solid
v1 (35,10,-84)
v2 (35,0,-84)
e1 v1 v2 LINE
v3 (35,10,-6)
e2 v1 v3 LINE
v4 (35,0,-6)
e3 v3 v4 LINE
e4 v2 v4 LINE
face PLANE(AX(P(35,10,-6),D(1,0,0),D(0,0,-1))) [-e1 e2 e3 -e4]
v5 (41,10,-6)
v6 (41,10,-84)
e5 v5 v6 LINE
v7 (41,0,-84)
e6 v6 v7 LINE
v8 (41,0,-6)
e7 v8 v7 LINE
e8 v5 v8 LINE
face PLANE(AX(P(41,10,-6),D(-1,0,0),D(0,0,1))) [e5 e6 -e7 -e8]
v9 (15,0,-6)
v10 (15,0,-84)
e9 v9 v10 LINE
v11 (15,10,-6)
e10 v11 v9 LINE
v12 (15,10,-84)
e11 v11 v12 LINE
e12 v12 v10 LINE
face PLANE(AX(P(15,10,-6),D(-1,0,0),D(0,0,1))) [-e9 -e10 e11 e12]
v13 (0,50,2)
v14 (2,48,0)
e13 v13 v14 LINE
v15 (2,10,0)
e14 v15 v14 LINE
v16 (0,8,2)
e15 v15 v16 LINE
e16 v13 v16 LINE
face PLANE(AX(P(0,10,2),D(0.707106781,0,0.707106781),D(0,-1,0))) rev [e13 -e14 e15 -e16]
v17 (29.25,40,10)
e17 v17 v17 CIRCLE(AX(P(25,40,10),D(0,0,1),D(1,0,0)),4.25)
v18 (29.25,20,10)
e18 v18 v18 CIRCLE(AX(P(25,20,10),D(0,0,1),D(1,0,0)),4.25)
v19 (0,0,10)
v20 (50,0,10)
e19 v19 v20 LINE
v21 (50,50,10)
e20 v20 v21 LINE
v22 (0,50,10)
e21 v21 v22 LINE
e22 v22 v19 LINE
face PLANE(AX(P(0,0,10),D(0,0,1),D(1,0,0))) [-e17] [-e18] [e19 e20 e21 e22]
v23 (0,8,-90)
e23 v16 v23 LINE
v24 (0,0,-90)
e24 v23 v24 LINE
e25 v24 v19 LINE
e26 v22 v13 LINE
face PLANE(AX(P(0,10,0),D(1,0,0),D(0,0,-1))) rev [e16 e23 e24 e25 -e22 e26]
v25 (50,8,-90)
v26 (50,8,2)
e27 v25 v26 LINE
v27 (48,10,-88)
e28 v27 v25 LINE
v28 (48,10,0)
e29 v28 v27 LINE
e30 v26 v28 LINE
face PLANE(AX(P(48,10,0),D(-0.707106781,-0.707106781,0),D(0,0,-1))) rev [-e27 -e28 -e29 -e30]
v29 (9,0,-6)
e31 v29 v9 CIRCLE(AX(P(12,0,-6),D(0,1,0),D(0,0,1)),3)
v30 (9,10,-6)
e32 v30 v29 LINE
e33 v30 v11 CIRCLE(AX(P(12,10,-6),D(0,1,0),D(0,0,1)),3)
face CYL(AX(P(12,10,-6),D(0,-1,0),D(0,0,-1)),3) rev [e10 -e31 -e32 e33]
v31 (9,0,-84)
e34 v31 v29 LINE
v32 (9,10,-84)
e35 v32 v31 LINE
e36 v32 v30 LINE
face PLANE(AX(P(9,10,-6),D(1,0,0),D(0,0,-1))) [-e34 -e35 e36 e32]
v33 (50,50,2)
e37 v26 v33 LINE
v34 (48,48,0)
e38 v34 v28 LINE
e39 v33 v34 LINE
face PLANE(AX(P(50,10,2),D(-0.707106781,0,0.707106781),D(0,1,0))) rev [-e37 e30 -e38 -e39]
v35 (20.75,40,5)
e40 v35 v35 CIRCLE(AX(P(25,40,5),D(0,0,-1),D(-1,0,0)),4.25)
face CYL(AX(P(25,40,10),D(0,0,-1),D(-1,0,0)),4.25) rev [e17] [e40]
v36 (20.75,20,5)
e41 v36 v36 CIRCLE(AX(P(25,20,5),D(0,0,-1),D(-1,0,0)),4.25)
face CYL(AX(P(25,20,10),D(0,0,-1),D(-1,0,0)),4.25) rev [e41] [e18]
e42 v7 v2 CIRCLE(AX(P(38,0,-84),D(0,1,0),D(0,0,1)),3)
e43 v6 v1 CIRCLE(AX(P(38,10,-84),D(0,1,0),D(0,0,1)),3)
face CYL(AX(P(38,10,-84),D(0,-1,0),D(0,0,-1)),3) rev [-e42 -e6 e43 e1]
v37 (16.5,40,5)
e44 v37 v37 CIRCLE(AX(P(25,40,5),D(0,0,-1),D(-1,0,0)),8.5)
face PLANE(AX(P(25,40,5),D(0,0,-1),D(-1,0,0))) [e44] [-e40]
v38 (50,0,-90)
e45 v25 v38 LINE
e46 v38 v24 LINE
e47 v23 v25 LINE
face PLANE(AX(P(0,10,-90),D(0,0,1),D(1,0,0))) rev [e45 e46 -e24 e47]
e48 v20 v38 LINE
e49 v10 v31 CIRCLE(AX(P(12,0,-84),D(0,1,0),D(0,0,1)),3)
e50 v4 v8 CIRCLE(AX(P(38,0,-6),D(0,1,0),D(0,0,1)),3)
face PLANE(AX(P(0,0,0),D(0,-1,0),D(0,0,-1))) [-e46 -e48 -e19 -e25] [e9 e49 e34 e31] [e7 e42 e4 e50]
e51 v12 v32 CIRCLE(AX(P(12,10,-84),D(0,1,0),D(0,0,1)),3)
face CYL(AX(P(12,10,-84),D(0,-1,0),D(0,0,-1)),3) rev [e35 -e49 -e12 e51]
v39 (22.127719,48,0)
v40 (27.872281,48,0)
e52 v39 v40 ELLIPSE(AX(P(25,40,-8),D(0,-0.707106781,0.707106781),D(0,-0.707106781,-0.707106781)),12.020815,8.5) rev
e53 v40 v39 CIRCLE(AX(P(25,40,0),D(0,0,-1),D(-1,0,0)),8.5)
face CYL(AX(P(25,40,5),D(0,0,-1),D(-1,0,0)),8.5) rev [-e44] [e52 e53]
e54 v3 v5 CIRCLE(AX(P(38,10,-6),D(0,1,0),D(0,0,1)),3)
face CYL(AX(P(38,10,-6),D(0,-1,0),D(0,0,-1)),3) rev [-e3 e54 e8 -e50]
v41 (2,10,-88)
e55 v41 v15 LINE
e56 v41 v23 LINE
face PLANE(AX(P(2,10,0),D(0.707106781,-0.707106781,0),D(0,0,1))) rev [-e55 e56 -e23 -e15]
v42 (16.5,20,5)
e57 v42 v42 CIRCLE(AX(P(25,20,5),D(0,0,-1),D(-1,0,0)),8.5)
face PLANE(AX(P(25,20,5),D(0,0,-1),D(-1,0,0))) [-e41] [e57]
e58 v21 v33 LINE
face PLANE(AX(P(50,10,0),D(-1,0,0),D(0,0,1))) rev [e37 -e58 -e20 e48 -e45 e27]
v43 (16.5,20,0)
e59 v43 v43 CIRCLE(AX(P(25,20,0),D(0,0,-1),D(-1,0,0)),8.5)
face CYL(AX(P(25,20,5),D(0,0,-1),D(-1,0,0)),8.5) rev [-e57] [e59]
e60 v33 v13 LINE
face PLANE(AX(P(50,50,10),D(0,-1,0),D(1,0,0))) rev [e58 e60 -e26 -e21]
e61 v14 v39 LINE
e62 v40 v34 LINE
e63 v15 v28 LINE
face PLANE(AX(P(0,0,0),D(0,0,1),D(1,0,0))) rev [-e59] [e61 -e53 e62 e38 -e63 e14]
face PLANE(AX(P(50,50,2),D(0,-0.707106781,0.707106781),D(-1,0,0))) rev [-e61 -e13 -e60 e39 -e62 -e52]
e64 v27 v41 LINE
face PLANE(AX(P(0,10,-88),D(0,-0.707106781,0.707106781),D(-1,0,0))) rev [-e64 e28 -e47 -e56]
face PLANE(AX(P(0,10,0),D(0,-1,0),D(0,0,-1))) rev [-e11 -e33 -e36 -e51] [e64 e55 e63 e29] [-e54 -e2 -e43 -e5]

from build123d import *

# Parameters (mm, degrees)
SKETCH1_W           = 50
SKETCH1_H           = 90
BOSS_EXTRUDE1_DEPTH = 10
SKETCH2_W           = 50
SKETCH2_H           = 50
SKETCH2_R           = 4.25
BOSS_EXTRUDE2_DEPTH = 10
SKETCH3_R           = 8.5
CUT_EXTRUDE1_DEPTH  = 5
CHAMFER1_SIZE       = 2


with BuildPart() as part:
    # Sketch1 → Boss-Extrude1 (new body)
    with BuildSketch(Plane(origin=(0, 0, 0), x_dir=(1, 0, 0), z_dir=(0, 1, 0))):
        with Locations((25, 45)):
            Rectangle(SKETCH1_W, SKETCH1_H)
        with BuildLine():
            Line((9, 6), (9, 84))
            ThreePointArc((9, 84), (12, 87), (15, 84))
            Line((15, 84), (15, 6))
            ThreePointArc((15, 6), (12, 3), (9, 6))
        make_face(mode=Mode.SUBTRACT)
        with BuildLine():
            Line((35, 6), (35, 84))
            ThreePointArc((35, 84), (38, 87), (41, 84))
            Line((41, 84), (41, 6))
            ThreePointArc((41, 6), (38, 3), (35, 6))
        make_face(mode=Mode.SUBTRACT)
    extrude(amount=BOSS_EXTRUDE1_DEPTH)

    # Sketch2 → Boss-Extrude2 (add)
    with BuildSketch(Plane.XY):
        with Locations((25, 25)):
            Rectangle(SKETCH2_W, SKETCH2_H)
        with Locations((25, 40)):
            Circle(SKETCH2_R, mode=Mode.SUBTRACT)
        with Locations((25, 20)):
            Circle(SKETCH2_R, mode=Mode.SUBTRACT)
    extrude(amount=BOSS_EXTRUDE2_DEPTH)

    # Sketch3 → Cut-Extrude1 (cut)
    with BuildSketch(Plane(origin=(0, 0, 0), x_dir=(-1, 0, 0), z_dir=(0, 0, -1))):
        with Locations((-25, 40)):
            Circle(SKETCH3_R)
        with Locations((-25, 20)):
            Circle(SKETCH3_R)
    extrude(amount=-CUT_EXTRUDE1_DEPTH, mode=Mode.SUBTRACT)

    # Chamfer1
    # the kernel refuses this chamfer: 2 mm, written as the material it takes off along each edge
    with BuildSketch(Plane(origin=(50, 10, 0), x_dir=(0.027495876610585623, -0.9996219169112968, 0), z_dir=(0, 0, -1))) as chamfer1_piece_1:
        Polygon((CHAMFER1_SIZE * 0.999621916911, CHAMFER1_SIZE * 0.0274958766106), (-CHAMFER1_SIZE * 0.0274958766106, CHAMFER1_SIZE * 0.999621916911), (0, 0), align=None)
    extrude(amount=95.143365976, mode=Mode.SUBTRACT)
    with BuildSketch(Plane(origin=(55.143365976, 10, -90), x_dir=(0, -0.9996219169112968, -0.027495876610589075), z_dir=(-1, 0, 0)), Plane(origin=(-5.143365976, 50, 0), x_dir=(0, 0.02749587661058563, 0.9996219169112968), z_dir=(1, 0, 0))) as chamfer1_piece_2:
        Polygon((CHAMFER1_SIZE * 0.999621916911, CHAMFER1_SIZE * 0.0274958766106), (-CHAMFER1_SIZE * 0.0274958766106, CHAMFER1_SIZE * 0.999621916911), (0, 0), align=None)
    extrude(amount=60.286731952, mode=Mode.SUBTRACT)
    with BuildSketch(Plane(origin=(50, 55.143365976, 0), x_dir=(0.02749587661058563, 0, 0.9996219169112968), z_dir=(0, -1, 0))) as chamfer1_piece_3:
        Polygon((CHAMFER1_SIZE * 0.999621916911, CHAMFER1_SIZE * 0.0274958766106), (-CHAMFER1_SIZE * 0.0274958766106, CHAMFER1_SIZE * 0.999621916911), (0, 0), align=None)
    extrude(amount=45.143365976, mode=Mode.SUBTRACT)
    with BuildSketch(Plane(origin=(0, 10, 0), x_dir=(0.9996219169112968, 0, -0.027495876610586372), z_dir=(0, 1, 0))) as chamfer1_piece_4:
        Polygon((CHAMFER1_SIZE * 0.999621916911, -CHAMFER1_SIZE * 0.0274958766106), (-CHAMFER1_SIZE * 0.0274958766106, -CHAMFER1_SIZE * 0.999621916911), (0, 0), align=None)
    extrude(amount=45.143365976, mode=Mode.SUBTRACT)
    with BuildSketch(Plane(origin=(0, 10, -95.143365976), x_dir=(0.9996219169112968, 0.027495876610586494, 0), z_dir=(0, 0, 1))) as chamfer1_piece_5:
        Polygon((CHAMFER1_SIZE * 0.999621916911, -CHAMFER1_SIZE * 0.0274958766106), (-CHAMFER1_SIZE * 0.0274958766106, -CHAMFER1_SIZE * 0.999621916911), (0, 0), align=None)
    extrude(amount=95.143365976, mode=Mode.SUBTRACT)
    with BuildSketch(Plane(origin=(50, 55.143365976, 0), x_dir=(0.02749587661058563, 0, 0.9996219169112968), z_dir=(0, -1, 0))) as chamfer1_piece_6a_section:
        Polygon((CHAMFER1_SIZE * 0.999621916911, CHAMFER1_SIZE * 0.0274958766106), (-CHAMFER1_SIZE * 0.0274958766106, CHAMFER1_SIZE * 0.999621916911), (0, 0), align=None)
    chamfer1_piece_6a = extrude(amount=50.286731952, mode=Mode.PRIVATE)
    chamfer1_piece_6a = split(chamfer1_piece_6a, bisect_by=Plane(origin=(49.340412746, 10, 0.659587254), z_dir=(0, -1, 0)), keep=Keep.TOP, mode=Mode.PRIVATE)
    with BuildSketch(Plane(origin=(50, 10, 5.143365976), x_dir=(0.027495876610585623, -0.9996219169112968, 0), z_dir=(0, 0, -1))) as chamfer1_piece_6b_section:
        Polygon((CHAMFER1_SIZE * 0.999621916911, CHAMFER1_SIZE * 0.0274958766106), (-CHAMFER1_SIZE * 0.0274958766106, CHAMFER1_SIZE * 0.999621916911), (0, 0), align=None)
    chamfer1_piece_6b = extrude(amount=100.286731952, mode=Mode.PRIVATE)
    chamfer1_piece_6b = split(chamfer1_piece_6b, bisect_by=Plane(origin=(49.340412746, 9.340412746, 0), z_dir=(0, 0, 1)), keep=Keep.TOP, mode=Mode.PRIVATE)
    chamfer1_piece_6 = chamfer1_piece_6a & chamfer1_piece_6b
    add(chamfer1_piece_6, mode=Mode.SUBTRACT)
    with BuildSketch(Plane(origin=(0, 4.856634024, 0), x_dir=(0.9996219169112968, 0, -0.027495876610586372), z_dir=(0, 1, 0))) as chamfer1_piece_7a_section:
        Polygon((CHAMFER1_SIZE * 0.999621916911, -CHAMFER1_SIZE * 0.0274958766106), (-CHAMFER1_SIZE * 0.0274958766106, -CHAMFER1_SIZE * 0.999621916911), (0, 0), align=None)
    chamfer1_piece_7a = extrude(amount=50.286731952, mode=Mode.PRIVATE)
    chamfer1_piece_7a = split(chamfer1_piece_7a, bisect_by=Plane(origin=(0.659587254, 10, 0.659587254), z_dir=(0, -1, 0)), keep=Keep.TOP, mode=Mode.PRIVATE)
    with BuildSketch(Plane(origin=(0, 10, -95.143365976), x_dir=(0.9996219169112968, 0.027495876610586494, 0), z_dir=(0, 0, 1))) as chamfer1_piece_7b_section:
        Polygon((CHAMFER1_SIZE * 0.999621916911, -CHAMFER1_SIZE * 0.0274958766106), (-CHAMFER1_SIZE * 0.0274958766106, -CHAMFER1_SIZE * 0.999621916911), (0, 0), align=None)
    chamfer1_piece_7b = extrude(amount=100.286731952, mode=Mode.PRIVATE)
    chamfer1_piece_7b = split(chamfer1_piece_7b, bisect_by=Plane(origin=(0.659587254, 9.340412746, 0), z_dir=(0, 0, 1)), keep=Keep.TOP, mode=Mode.PRIVATE)
    chamfer1_piece_7 = chamfer1_piece_7a & chamfer1_piece_7b
    add(chamfer1_piece_7, mode=Mode.SUBTRACT)


solid = part.part
